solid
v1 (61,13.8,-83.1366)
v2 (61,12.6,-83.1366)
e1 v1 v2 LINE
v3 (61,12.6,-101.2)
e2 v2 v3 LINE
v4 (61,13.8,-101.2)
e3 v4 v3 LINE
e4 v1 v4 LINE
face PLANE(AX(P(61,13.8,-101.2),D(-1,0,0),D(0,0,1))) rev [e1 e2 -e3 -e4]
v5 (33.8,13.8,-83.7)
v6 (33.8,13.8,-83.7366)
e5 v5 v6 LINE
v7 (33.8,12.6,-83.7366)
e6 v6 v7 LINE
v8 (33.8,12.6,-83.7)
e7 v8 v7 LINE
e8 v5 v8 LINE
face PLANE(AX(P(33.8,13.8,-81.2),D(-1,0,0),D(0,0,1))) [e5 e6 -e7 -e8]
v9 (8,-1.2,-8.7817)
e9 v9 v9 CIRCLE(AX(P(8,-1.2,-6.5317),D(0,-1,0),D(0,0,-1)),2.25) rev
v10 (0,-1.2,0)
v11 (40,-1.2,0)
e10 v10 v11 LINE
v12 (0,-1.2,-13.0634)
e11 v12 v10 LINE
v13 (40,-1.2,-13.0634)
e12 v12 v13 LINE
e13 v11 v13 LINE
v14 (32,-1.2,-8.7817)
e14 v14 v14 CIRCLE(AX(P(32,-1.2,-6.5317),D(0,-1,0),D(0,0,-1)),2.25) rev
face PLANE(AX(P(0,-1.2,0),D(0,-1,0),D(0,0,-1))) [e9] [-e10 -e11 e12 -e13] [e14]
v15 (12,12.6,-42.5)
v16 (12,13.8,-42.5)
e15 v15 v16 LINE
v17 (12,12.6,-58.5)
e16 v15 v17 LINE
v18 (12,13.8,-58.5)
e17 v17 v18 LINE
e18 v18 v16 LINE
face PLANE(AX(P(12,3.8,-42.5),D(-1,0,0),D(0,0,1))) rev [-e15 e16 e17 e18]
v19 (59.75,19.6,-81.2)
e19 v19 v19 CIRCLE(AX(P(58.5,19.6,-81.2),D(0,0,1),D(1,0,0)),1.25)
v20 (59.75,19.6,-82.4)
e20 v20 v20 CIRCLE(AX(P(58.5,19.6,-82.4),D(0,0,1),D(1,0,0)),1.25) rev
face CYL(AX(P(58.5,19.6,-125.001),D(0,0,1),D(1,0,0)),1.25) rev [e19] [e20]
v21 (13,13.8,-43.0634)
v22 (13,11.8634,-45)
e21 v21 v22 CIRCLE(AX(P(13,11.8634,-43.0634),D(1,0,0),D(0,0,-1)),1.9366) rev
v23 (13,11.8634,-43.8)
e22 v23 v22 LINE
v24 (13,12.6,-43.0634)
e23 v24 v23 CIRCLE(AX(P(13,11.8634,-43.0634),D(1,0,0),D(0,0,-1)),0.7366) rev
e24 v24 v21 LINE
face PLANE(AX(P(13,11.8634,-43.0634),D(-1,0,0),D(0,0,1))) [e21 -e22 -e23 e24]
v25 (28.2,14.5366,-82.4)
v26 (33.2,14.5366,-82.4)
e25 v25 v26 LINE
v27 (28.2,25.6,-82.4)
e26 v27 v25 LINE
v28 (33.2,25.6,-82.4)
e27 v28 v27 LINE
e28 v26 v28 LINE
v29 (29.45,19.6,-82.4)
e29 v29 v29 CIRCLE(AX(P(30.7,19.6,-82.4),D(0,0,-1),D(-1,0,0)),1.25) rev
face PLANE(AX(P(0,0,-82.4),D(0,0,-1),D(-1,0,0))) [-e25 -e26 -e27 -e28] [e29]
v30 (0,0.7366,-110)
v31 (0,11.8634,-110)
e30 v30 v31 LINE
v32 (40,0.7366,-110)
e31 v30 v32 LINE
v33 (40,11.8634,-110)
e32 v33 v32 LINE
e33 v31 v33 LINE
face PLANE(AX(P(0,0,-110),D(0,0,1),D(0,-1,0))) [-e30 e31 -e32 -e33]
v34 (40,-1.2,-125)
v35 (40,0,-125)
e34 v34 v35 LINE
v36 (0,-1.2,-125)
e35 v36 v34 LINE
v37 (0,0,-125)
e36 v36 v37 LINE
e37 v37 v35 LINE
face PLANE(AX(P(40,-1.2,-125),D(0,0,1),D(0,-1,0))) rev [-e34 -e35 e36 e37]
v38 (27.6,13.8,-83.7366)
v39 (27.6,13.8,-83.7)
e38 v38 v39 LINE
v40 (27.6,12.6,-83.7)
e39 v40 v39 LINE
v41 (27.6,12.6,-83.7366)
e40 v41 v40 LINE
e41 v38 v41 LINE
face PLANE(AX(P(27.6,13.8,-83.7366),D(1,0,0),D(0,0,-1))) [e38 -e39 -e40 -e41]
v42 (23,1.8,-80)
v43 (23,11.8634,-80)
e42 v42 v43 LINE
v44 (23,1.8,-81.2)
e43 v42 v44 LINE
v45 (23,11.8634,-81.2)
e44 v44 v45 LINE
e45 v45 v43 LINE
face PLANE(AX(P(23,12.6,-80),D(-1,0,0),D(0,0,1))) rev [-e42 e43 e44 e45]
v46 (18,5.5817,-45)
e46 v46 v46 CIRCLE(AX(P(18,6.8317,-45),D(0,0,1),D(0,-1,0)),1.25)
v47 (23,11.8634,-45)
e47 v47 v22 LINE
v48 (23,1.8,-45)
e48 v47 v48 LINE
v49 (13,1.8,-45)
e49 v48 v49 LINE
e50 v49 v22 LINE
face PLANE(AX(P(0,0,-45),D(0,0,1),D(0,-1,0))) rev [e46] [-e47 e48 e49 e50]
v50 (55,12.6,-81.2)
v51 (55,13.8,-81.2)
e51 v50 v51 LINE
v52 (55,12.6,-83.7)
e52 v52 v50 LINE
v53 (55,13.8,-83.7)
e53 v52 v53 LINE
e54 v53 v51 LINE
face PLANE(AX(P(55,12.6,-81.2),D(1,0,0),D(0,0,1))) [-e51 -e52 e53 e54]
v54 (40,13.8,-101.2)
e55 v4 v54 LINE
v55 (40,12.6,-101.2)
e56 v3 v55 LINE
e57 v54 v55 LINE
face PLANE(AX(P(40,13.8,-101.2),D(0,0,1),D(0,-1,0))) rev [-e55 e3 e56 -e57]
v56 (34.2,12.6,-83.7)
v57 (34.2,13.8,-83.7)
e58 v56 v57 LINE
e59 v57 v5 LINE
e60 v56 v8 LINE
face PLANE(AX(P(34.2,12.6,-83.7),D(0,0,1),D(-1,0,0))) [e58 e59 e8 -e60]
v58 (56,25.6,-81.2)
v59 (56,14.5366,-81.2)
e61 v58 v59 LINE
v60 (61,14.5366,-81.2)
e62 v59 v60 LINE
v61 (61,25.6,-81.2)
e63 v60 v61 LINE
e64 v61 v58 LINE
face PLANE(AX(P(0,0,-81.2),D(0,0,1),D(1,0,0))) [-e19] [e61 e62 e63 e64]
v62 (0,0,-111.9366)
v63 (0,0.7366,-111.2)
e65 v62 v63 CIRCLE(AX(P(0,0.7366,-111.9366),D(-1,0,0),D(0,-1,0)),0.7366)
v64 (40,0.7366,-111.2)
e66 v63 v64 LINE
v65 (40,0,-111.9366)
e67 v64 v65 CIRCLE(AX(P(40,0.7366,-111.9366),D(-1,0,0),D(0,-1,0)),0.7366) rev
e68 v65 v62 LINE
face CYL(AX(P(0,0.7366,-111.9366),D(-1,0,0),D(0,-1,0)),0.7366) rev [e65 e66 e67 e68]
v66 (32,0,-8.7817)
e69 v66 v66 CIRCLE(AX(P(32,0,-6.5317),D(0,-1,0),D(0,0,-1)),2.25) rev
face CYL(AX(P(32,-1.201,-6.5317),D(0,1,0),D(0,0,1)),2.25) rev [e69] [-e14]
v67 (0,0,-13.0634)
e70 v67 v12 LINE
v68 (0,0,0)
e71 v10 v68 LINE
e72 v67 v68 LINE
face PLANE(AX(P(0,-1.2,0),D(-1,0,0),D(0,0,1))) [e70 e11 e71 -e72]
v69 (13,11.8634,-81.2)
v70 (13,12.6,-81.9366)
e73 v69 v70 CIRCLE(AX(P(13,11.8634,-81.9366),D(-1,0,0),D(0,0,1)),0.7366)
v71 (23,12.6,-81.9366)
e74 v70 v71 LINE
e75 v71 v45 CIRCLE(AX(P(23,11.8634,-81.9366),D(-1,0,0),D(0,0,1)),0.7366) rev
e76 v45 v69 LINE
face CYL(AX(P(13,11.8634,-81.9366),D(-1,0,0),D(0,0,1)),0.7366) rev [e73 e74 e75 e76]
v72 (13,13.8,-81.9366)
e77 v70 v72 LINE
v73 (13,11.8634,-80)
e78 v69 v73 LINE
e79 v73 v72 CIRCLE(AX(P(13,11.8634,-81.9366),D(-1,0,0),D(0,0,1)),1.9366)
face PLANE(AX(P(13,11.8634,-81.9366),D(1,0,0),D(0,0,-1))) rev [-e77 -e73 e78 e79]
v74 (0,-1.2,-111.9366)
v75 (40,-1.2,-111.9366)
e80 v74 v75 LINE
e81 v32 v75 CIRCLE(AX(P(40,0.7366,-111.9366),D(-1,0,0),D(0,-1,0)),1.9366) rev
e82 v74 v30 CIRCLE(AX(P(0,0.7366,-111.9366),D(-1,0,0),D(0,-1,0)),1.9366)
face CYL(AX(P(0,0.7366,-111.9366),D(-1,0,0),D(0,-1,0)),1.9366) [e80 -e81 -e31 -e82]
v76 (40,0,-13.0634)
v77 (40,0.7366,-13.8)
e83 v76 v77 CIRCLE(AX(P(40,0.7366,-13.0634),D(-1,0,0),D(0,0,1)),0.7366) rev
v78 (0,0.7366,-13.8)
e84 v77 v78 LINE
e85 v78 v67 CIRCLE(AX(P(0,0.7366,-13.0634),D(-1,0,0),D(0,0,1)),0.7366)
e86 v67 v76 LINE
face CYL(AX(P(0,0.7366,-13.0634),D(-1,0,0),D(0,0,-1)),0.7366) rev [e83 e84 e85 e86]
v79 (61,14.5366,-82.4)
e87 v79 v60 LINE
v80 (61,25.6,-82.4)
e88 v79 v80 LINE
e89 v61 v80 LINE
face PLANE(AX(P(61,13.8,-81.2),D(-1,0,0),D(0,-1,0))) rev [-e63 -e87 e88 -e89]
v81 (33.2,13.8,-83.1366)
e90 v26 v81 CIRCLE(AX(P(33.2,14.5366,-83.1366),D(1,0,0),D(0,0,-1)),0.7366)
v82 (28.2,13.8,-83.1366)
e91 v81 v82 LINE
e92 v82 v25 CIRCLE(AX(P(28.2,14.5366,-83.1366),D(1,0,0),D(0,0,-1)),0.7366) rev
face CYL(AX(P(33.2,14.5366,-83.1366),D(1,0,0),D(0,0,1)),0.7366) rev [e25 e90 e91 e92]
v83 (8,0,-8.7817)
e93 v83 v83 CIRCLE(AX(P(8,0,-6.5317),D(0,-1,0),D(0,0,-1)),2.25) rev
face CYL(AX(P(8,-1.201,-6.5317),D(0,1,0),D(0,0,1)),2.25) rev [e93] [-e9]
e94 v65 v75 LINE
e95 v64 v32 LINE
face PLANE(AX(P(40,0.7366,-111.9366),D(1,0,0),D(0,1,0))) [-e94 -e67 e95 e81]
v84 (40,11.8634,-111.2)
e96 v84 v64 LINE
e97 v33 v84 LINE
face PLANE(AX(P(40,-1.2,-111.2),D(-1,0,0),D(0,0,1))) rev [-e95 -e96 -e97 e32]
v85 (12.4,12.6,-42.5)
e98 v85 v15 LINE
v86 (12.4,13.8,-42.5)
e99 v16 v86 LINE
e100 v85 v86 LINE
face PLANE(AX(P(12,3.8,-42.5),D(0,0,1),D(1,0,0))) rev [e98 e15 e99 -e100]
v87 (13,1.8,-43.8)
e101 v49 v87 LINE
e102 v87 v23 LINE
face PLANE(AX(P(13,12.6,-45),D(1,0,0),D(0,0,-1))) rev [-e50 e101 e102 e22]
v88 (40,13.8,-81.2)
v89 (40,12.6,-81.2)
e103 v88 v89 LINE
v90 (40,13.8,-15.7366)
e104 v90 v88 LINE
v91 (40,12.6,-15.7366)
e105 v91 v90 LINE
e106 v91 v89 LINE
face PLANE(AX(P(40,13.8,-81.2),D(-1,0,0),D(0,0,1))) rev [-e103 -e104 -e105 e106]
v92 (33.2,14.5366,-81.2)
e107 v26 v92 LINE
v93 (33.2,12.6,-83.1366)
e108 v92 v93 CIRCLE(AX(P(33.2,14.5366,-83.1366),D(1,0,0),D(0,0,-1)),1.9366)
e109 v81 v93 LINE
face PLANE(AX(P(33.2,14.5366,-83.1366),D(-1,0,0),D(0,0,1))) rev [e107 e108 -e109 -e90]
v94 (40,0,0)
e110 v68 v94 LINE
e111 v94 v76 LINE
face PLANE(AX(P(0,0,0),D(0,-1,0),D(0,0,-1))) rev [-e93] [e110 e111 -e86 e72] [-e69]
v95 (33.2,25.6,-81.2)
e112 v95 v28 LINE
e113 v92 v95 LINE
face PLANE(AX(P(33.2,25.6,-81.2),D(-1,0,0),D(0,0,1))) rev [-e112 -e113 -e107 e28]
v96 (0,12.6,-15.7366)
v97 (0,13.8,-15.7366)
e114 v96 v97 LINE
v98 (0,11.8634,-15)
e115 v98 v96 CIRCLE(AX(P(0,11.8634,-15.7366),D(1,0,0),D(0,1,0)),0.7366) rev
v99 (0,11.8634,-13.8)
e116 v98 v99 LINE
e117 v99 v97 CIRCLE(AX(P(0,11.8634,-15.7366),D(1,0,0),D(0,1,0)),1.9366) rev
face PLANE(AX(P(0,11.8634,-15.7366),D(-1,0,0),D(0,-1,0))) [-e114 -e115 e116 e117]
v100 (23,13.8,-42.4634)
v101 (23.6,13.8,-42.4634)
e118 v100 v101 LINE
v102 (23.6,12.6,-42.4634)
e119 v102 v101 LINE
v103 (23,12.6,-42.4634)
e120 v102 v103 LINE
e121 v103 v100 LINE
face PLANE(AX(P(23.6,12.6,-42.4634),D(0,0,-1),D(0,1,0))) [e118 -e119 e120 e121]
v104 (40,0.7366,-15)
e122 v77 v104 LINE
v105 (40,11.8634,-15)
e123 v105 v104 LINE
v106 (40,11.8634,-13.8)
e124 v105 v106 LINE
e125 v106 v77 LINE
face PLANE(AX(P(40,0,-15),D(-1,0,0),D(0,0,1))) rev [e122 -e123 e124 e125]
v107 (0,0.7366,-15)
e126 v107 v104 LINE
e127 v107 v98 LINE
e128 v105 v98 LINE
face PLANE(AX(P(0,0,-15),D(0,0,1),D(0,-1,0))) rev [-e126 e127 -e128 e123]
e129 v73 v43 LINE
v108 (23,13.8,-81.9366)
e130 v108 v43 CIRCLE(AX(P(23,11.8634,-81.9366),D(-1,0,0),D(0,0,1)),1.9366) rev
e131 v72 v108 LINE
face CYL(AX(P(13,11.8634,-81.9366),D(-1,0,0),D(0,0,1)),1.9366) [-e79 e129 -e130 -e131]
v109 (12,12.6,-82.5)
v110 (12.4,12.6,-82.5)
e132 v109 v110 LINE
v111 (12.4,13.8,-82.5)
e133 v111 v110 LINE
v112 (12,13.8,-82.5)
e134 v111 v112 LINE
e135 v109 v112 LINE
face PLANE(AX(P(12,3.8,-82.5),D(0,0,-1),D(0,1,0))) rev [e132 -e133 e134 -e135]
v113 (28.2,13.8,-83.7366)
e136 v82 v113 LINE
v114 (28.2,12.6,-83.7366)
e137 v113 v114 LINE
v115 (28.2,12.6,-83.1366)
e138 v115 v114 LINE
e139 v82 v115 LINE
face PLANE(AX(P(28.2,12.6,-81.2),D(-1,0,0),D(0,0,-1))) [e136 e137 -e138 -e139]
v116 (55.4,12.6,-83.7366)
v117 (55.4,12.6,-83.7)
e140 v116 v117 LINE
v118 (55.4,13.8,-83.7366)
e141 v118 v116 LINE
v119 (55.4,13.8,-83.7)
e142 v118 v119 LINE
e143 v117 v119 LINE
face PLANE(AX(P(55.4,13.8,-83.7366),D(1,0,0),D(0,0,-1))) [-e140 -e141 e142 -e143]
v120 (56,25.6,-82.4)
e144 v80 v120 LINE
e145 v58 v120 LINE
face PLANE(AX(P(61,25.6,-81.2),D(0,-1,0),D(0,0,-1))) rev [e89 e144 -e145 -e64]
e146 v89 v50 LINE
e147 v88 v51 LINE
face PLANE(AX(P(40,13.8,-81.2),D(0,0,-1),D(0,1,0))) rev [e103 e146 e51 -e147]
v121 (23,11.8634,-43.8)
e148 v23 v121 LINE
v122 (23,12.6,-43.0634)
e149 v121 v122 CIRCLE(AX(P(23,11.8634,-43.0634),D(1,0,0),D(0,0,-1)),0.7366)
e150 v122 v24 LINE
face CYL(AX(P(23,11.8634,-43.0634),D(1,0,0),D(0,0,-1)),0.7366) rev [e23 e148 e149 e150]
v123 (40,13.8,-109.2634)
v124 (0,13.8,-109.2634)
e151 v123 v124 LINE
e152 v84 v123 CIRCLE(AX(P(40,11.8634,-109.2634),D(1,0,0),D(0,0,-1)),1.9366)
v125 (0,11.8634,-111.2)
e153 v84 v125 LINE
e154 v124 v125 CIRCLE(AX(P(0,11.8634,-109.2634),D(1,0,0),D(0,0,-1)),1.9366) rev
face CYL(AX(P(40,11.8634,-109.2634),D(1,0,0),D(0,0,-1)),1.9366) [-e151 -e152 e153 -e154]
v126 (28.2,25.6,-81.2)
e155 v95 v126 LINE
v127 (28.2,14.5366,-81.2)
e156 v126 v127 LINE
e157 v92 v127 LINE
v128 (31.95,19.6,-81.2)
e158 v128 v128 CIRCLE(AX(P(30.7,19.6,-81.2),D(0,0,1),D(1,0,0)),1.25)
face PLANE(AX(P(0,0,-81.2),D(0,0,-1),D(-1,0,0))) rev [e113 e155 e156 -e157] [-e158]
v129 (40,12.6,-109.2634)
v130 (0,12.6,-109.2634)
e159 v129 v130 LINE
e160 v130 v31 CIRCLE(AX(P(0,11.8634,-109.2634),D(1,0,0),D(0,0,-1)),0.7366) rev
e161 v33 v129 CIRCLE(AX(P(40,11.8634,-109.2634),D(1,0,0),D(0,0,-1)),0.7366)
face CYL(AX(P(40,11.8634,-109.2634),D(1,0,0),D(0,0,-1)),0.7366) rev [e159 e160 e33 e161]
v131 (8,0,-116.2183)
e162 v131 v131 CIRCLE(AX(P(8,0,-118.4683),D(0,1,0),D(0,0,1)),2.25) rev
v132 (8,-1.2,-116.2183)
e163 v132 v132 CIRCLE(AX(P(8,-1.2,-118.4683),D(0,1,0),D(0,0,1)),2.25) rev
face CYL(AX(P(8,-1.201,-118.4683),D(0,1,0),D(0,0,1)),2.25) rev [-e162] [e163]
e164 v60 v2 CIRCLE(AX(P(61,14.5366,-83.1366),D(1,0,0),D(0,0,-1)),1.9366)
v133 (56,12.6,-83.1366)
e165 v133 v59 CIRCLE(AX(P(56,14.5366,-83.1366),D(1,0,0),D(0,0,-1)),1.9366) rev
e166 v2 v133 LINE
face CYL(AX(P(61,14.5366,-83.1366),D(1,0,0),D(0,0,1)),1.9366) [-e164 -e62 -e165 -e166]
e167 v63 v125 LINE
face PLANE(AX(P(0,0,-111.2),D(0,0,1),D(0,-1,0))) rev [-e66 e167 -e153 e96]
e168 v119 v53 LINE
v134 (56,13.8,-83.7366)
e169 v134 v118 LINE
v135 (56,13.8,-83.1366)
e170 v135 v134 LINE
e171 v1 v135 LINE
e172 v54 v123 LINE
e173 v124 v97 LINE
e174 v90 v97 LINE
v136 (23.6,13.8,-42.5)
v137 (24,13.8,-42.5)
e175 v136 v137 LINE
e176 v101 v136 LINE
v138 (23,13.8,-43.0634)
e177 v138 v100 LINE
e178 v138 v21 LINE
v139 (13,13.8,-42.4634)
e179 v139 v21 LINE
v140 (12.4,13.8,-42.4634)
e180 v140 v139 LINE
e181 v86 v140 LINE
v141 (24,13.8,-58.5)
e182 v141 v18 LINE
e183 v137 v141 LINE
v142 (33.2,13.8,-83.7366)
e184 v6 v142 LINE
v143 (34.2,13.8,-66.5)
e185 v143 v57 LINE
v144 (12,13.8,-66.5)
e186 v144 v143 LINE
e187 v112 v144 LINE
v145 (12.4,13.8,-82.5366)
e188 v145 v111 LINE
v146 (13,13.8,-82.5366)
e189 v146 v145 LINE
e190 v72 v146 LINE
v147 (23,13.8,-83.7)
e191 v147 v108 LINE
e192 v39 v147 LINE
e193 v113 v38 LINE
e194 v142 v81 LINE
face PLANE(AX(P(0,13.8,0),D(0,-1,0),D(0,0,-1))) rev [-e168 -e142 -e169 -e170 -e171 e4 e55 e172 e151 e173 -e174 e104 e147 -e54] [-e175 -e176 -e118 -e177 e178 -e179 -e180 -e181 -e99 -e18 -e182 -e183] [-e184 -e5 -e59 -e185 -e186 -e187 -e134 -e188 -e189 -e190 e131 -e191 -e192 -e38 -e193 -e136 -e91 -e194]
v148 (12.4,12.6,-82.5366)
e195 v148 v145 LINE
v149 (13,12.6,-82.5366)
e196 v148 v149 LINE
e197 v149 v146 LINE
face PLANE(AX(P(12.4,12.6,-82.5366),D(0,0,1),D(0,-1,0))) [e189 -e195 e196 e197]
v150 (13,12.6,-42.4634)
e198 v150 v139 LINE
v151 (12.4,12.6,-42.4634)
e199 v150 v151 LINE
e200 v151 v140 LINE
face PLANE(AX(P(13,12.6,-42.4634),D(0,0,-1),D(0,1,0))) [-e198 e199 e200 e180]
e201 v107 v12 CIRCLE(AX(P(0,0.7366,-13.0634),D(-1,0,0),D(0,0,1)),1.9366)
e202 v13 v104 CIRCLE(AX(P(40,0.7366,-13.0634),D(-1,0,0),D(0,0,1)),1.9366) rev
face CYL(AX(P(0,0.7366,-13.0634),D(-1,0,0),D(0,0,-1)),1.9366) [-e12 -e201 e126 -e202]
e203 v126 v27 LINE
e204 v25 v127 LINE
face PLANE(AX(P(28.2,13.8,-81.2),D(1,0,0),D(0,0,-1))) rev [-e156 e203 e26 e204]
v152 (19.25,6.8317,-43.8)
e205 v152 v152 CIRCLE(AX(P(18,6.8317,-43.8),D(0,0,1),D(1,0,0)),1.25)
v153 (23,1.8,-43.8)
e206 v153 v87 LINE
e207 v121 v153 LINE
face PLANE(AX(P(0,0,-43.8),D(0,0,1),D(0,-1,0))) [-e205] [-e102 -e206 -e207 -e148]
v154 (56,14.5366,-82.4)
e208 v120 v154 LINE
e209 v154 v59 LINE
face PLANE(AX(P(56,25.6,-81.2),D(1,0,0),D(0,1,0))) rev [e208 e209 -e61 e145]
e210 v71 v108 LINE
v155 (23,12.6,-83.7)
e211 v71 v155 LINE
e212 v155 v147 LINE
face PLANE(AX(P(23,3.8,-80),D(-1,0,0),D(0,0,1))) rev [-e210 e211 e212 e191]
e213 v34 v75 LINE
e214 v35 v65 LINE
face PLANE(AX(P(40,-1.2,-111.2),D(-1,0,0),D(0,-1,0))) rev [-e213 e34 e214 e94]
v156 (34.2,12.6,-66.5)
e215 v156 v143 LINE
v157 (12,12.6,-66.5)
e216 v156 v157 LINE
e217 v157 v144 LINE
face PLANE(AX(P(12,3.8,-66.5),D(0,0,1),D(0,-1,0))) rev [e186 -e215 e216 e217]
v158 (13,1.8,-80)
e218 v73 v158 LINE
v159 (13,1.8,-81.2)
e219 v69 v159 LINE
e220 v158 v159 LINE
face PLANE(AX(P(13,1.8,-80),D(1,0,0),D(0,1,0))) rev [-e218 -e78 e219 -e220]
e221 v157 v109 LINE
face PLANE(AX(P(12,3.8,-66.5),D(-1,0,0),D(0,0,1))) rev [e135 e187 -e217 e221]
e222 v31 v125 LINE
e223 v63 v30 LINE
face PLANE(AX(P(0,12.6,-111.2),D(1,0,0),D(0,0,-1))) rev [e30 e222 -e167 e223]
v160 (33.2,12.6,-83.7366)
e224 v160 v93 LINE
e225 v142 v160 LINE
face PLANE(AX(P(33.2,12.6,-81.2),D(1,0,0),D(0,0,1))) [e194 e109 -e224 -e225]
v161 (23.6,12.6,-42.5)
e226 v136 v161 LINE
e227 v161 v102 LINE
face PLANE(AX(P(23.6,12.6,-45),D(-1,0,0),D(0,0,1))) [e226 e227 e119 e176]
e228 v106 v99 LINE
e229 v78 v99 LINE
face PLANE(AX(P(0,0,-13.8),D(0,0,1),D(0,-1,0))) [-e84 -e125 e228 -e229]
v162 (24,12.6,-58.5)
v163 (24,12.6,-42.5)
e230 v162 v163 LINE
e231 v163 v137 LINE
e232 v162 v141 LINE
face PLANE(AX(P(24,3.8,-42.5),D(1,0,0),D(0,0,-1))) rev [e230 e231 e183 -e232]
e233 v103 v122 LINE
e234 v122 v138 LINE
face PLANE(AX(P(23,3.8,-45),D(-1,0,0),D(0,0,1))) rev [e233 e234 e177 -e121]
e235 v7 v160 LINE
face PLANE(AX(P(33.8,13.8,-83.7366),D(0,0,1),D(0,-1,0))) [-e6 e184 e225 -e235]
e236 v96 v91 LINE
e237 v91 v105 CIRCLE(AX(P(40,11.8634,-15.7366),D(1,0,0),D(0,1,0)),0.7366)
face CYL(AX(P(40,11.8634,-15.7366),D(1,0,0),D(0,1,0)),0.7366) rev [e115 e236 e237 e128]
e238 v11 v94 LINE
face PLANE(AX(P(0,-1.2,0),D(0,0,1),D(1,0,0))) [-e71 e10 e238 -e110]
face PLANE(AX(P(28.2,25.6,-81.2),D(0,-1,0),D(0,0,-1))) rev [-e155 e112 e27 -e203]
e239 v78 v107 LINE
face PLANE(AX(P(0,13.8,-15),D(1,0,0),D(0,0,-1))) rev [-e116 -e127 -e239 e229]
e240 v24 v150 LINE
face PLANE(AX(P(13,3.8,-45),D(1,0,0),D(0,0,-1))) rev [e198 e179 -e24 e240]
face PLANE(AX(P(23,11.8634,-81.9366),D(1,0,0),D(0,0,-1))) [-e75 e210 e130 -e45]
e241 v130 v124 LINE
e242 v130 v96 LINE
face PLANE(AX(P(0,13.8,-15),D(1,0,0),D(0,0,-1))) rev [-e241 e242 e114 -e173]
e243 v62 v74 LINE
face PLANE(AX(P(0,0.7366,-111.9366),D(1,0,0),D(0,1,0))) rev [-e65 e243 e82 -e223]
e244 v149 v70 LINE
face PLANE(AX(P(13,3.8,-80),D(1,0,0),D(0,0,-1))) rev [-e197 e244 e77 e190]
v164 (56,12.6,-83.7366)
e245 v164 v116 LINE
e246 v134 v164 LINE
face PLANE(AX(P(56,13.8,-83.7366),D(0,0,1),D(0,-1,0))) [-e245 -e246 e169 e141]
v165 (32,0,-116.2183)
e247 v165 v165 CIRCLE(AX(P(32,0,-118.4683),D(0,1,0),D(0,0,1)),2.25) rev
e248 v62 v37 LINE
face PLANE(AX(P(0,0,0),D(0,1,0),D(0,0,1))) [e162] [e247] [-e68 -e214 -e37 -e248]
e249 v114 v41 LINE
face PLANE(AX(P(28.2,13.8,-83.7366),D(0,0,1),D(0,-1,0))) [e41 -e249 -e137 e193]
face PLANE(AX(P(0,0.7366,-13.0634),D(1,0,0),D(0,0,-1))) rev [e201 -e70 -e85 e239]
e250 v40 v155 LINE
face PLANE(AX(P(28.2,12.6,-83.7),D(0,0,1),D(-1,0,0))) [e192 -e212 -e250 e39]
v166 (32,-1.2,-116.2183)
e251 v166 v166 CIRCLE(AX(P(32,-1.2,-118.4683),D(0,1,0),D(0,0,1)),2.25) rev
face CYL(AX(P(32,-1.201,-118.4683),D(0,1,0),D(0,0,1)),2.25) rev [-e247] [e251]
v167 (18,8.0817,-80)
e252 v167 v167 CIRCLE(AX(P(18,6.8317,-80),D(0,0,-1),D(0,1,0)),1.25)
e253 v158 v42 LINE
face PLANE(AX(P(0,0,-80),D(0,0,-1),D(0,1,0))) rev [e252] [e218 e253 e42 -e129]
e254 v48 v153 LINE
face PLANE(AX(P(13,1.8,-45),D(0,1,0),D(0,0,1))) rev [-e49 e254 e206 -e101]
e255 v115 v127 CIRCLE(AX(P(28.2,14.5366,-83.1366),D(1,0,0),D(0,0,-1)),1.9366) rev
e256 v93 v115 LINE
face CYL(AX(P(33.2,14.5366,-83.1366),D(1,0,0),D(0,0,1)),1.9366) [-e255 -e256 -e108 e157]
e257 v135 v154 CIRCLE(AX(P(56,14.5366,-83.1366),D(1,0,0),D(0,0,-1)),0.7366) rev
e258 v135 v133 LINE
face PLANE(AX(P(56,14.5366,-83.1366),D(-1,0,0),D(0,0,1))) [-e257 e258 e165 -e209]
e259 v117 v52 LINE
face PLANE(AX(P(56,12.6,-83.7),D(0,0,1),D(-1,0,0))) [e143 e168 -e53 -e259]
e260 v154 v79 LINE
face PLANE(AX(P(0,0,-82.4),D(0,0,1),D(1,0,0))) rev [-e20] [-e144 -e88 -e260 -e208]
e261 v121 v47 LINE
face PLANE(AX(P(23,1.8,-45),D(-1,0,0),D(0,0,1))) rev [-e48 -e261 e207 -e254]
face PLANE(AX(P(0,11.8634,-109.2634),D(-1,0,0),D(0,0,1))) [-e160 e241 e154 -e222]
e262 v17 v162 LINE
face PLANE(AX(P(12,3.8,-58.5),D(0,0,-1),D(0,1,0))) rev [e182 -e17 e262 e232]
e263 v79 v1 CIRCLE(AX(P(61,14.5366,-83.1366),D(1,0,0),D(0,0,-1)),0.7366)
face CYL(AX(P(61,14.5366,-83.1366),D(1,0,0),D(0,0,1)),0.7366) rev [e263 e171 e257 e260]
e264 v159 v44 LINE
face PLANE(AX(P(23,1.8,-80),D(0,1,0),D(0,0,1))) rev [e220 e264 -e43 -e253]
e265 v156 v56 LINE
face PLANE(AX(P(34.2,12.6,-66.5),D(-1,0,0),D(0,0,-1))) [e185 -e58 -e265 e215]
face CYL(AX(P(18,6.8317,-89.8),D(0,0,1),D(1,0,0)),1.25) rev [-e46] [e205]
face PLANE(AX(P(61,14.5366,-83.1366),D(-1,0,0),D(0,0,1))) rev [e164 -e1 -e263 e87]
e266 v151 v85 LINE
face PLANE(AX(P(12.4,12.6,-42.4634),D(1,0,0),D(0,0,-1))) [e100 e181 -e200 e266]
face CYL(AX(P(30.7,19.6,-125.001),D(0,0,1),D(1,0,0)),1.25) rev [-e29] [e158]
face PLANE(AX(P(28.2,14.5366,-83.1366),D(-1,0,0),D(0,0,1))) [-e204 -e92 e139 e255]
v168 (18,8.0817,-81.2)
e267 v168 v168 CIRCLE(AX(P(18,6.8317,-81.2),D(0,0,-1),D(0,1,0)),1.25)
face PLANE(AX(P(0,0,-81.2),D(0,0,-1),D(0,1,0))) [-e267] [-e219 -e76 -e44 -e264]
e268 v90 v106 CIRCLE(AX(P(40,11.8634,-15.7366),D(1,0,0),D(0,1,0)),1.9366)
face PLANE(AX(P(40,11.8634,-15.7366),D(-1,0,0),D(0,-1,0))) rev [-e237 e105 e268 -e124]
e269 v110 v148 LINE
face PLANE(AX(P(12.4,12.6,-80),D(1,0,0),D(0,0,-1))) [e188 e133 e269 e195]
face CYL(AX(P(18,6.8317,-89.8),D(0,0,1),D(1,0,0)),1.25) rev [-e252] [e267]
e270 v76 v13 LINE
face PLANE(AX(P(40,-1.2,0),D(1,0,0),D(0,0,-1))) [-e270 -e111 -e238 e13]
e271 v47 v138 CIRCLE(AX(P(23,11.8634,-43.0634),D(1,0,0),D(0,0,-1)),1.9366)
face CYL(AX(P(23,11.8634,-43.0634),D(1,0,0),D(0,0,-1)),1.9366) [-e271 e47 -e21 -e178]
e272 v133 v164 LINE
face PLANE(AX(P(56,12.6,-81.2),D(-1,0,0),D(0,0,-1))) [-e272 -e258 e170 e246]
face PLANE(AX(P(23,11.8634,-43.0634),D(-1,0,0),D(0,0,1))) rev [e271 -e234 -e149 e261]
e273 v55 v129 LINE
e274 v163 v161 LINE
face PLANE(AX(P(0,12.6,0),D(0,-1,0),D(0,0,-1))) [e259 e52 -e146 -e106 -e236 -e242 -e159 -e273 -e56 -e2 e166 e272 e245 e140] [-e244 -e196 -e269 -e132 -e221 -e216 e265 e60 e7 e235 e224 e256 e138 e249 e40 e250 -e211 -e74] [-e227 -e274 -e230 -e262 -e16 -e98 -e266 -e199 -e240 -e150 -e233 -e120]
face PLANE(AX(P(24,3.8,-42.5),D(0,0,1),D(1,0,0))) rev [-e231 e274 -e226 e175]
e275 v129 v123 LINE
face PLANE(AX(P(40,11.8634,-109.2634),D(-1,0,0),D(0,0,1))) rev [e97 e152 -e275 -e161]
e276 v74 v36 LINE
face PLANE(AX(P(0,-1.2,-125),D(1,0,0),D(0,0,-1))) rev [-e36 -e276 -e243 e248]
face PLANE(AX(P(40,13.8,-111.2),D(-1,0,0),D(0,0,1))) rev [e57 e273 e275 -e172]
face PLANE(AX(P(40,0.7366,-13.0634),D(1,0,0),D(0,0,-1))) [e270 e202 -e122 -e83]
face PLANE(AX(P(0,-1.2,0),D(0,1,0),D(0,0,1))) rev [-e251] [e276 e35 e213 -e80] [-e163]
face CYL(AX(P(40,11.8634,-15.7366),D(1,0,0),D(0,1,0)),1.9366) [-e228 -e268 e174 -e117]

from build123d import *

# Parameters (mm, degrees)
SKETCH_1_W                       = 40
SKETCH_1_H                       = 15
SM_BASE_FLANGE_1_DEPTH           = 1.2
SM_EDGE_FLANGE_1_STRIP_W         = 6.2732
SM_EDGE_FLANGE_1_STRIP_H         = 1.2
SM_EDGE_FLANGE_1_STRIP_CUT_DEPTH = 40
SM_EDGE_FLANGE_1_DEPTH           = 40
SM_EDGE_FLANGE_2_STRIP_W         = 6.2732
SM_EDGE_FLANGE_2_STRIP_H         = 1.2
SM_EDGE_FLANGE_2_STRIP_CUT_DEPTH = 40
SM_EDGE_FLANGE_2_DEPTH           = 40
SM_EDGE_FLANGE_2_FLAT_DEPTH      = 1.2
SM_EDGE_FLANGE_3_STRIP_W         = 6.2732
SM_EDGE_FLANGE_3_STRIP_H         = 1.2
SM_EDGE_FLANGE_3_STRIP_CUT_DEPTH = 40
SM_EDGE_FLANGE_3_DEPTH           = 40
SM_EDGE_FLANGE_4_STRIP_W         = 6.2732
SM_EDGE_FLANGE_4_STRIP_H         = 1.2
SM_EDGE_FLANGE_4_STRIP_CUT_DEPTH = 40
SM_EDGE_FLANGE_4_DEPTH           = 40
CUT_EXTRUDE_1_DEPTH              = 10
SM_START                         = 13
SM_EDGE_FLANGE_5_DEPTH           = 10
SM_START_2                       = 12.4
SM_EDGE_FLANGE_5_2_OUTLINE_W     = 1.2
SM_EDGE_FLANGE_5_2_OUTLINE_H     = 0.0366
SM_EDGE_FLANGE_5_2_DEPTH         = 0.6
SM_START_3                       = 23
SM_EDGE_FLANGE_5_3_OUTLINE_W     = 1.2
SM_EDGE_FLANGE_5_3_OUTLINE_H     = 0.0366
SM_EDGE_FLANGE_5_3_DEPTH         = 0.6
SM_EDGE_FLANGE_5_4_DEPTH         = 10
SKETCH_26_R                      = 1.25
CUT_EXTRUDE_2_DEPTH              = 46
CUT_EXTRUDE_3_REACH              = 141.896
SKETCH_28_W                      = 1
SKETCH_28_H                      = 2.5
SM_START_4                       = 28.2
SM_EDGE_FLANGE_6_DEPTH           = 5
SM_START_5                       = 56
SM_EDGE_FLANGE_6_2_DEPTH         = 5
SM_START_6                       = 27.6
SM_EDGE_FLANGE_6_3_OUTLINE_W     = 1.2
SM_EDGE_FLANGE_6_3_OUTLINE_H     = 0.0366
SM_EDGE_FLANGE_6_3_DEPTH         = 0.6
SM_START_7                       = 33.2
SM_EDGE_FLANGE_6_4_OUTLINE_W     = 1.2
SM_EDGE_FLANGE_6_4_OUTLINE_H     = 0.0366
SM_EDGE_FLANGE_6_4_DEPTH         = 0.6
SM_START_8                       = 55.4
SM_EDGE_FLANGE_6_5_OUTLINE_W     = 1.2
SM_EDGE_FLANGE_6_5_OUTLINE_H     = 0.0366
SM_EDGE_FLANGE_6_5_DEPTH         = 0.6
SM_EDGE_FLANGE_6_6_DEPTH         = 5
SM_EDGE_FLANGE_6_7_DEPTH         = 5
CUT_EXTRUDE_4_REACH              = 106.737
SKETCH_35_R                      = 1.25
CUT_EXTRUDE_5_REACH              = 141.896
SKETCH_36_R                      = 2.25


# Read off the part's stored shape, not the designer's step: Ребро-кромка5, Ребро-кромка6
# Sheet-metal steps are written as plain solids
with BuildPart() as part:
    # Sketch 1 → Базовая кромка1 (new body)
    with BuildSketch(Plane(origin=(0, 0, 0), x_dir=(1, 0, 0), z_dir=(0, 1, 0))):
        with Locations((20, 7.5)):
            Rectangle(SKETCH_1_W, SKETCH_1_H)
    extrude(amount=-SM_BASE_FLANGE_1_DEPTH)

    # Ребро-кромка1 strip (across the edge) → Ребро-кромка1 strip cut (cut)
    with BuildSketch(Plane(origin=(40, 0, -15), x_dir=(0, 0, 1), z_dir=(-1, 0, 0))):
        with Locations((-1.2, -0.6)):
            Rectangle(SM_EDGE_FLANGE_1_STRIP_W, SM_EDGE_FLANGE_1_STRIP_H)
    extrude(amount=SM_EDGE_FLANGE_1_STRIP_CUT_DEPTH, mode=Mode.SUBTRACT)

    # Ребро-кромка1 section (across the edge) → Ребро-кромка1 (add)
    with BuildSketch(Plane(origin=(40, 0, -15), x_dir=(0, 0, 1), z_dir=(-1, 0, 0))):
        with BuildLine():
            Line((0, 0.7366), (0, 13.8))
            Line((0, 13.8), (1.2, 13.8))
            Line((1.2, 13.8), (1.2, 0.7366))
            ThreePointArc((1.2, 0.7366), (1.415745145, 0.215745145), (1.9366, 0))
            Line((1.9366, 0), (1.9366, -1.2))
            ThreePointArc((1.9366, -1.2), (0.567217008, -0.632782992), (0, 0.7366))
        make_face()
    extrude(amount=SM_EDGE_FLANGE_1_DEPTH)

    # Ребро-кромка2 strip (across the edge) → Ребро-кромка2 strip cut (cut)
    with BuildSketch(Plane(origin=(0, 13.8, -15), x_dir=(0, -1, 0), z_dir=(1, 0, 0))):
        with Locations((-1.2, -0.6)):
            Rectangle(SM_EDGE_FLANGE_2_STRIP_W, SM_EDGE_FLANGE_2_STRIP_H)
    extrude(amount=SM_EDGE_FLANGE_2_STRIP_CUT_DEPTH, mode=Mode.SUBTRACT)

    # Ребро-кромка2 bend section (across the edge) → Ребро-кромка2 (add)
    with BuildSketch(Plane(origin=(0, 13.8, -15), x_dir=(0, -1, 0), z_dir=(1, 0, 0))):
        with BuildLine():
            Line((0, 0.7366), (1.2, 0.7366))
            ThreePointArc((1.2, 0.7366), (1.415745145, 0.215745145), (1.9366, 0))
            Line((1.9366, 0), (1.9366, -1.2))
            ThreePointArc((1.9366, -1.2), (0.567217008, -0.632782992), (0, 0.7366))
        make_face()
    extrude(amount=SM_EDGE_FLANGE_2_DEPTH)

    # Ребро-кромка2 profile (on flange) → Ребро-кромка2 flat (add)
    with BuildSketch(Plane(origin=(0, 13.8, -15), x_dir=(1, 0, 0), z_dir=(0, 1, 0))):
        Polygon((0, 0.7366), (40, 0.7366), (40, 66.2), (61, 66.2), (61, 86.2), (40, 86.2), (40, 96.2), (0, 96.2), align=None)
    extrude(amount=-SM_EDGE_FLANGE_2_FLAT_DEPTH)

    # Ребро-кромка3 strip (across the edge) → Ребро-кромка3 strip cut (cut)
    with BuildSketch(Plane(origin=(0, 12.6, -111.2), x_dir=(0, 0, 1), z_dir=(1, 0, 0))):
        with Locations((-1.2, -0.6)):
            Rectangle(SM_EDGE_FLANGE_3_STRIP_W, SM_EDGE_FLANGE_3_STRIP_H)
    extrude(amount=SM_EDGE_FLANGE_3_STRIP_CUT_DEPTH, mode=Mode.SUBTRACT)

    # Ребро-кромка3 section (across the edge) → Ребро-кромка3 (add)
    with BuildSketch(Plane(origin=(0, 12.6, -111.2), x_dir=(0, 0, 1), z_dir=(1, 0, 0))):
        with BuildLine():
            Line((0, 0.7366), (0, 13.8))
            Line((0, 13.8), (1.2, 13.8))
            Line((1.2, 13.8), (1.2, 0.7366))
            ThreePointArc((1.2, 0.7366), (1.415745145, 0.215745145), (1.9366, 0))
            Line((1.9366, 0), (1.9366, -1.2))
            ThreePointArc((1.9366, -1.2), (0.567217008, -0.632782992), (0, 0.7366))
        make_face()
    extrude(amount=SM_EDGE_FLANGE_3_DEPTH)

    # Ребро-кромка4 strip (across the edge) → Ребро-кромка4 strip cut (cut)
    with BuildSketch(Plane(origin=(40, -1.2, -111.2), x_dir=(0, 1, 0), z_dir=(-1, 0, 0))):
        with Locations((-1.2, -0.6)):
            Rectangle(SM_EDGE_FLANGE_4_STRIP_W, SM_EDGE_FLANGE_4_STRIP_H)
    extrude(amount=SM_EDGE_FLANGE_4_STRIP_CUT_DEPTH, mode=Mode.SUBTRACT)

    # Ребро-кромка4 section (across the edge) → Ребро-кромка4 (add)
    with BuildSketch(Plane(origin=(40, -1.2, -111.2), x_dir=(0, 1, 0), z_dir=(-1, 0, 0))):
        with BuildLine():
            Line((0, 0.7366), (0, 13.8))
            Line((0, 13.8), (1.2, 13.8))
            Line((1.2, 13.8), (1.2, 0.7366))
            ThreePointArc((1.2, 0.7366), (1.415745145, 0.215745145), (1.9366, 0))
            Line((1.9366, 0), (1.9366, -1.2))
            ThreePointArc((1.9366, -1.2), (0.567217008, -0.632782992), (0, 0.7366))
        make_face()
    extrude(amount=SM_EDGE_FLANGE_4_DEPTH)

    # Эскиз19 → Вырез-Вытянуть1 (cut)
    with BuildSketch(Plane(origin=(0, 13.8, 0), x_dir=(1, 0, 0), z_dir=(0, 1, 0))):
        Polygon((13, 45), (23, 45), (23, 42.5), (24, 42.5), (24, 58.5), (12, 58.5), (12, 42.5), (13, 42.5), align=None)
        Polygon((12, 66.5), (24, 66.5), (24, 82.5), (23, 82.5), (23, 80), (13, 80), (13, 82.5), (12, 82.5), align=None)
    extrude(amount=-CUT_EXTRUDE_1_DEPTH, mode=Mode.SUBTRACT)

    # Ребро-кромка5 outline → Ребро-кромка5 (cut)
    with BuildSketch(Plane.YZ.offset(SM_START)):
        with BuildLine():
            ThreePointArc((12.6, -80.145555612), (13.472269031, -80.858657516), (13.8, -81.9366))
            Line((13.8, -81.9366), (13.8, -80))
            Line((13.8, -80), (12.6, -80))
            Line((12.6, -80), (12.6, -80.145555612))
        make_face()
        with BuildLine():
            Line((12.6, -45), (13.8, -45))
            Line((13.8, -45), (13.8, -43.0634))
            ThreePointArc((13.8, -43.0634), (13.472269031, -44.141342484), (12.6, -44.854444388))
            Line((12.6, -44.854444388), (12.6, -45))
        make_face()
    extrude(amount=SM_EDGE_FLANGE_5_DEPTH, mode=Mode.SUBTRACT)

    # Sm Edge Flange 5 2 outline → Sm Edge Flange 5 2 (cut)
    with BuildSketch(Plane.YZ.offset(SM_START_2)):
        with Locations((13.2, -82.5183)):
            Rectangle(SM_EDGE_FLANGE_5_2_OUTLINE_W, SM_EDGE_FLANGE_5_2_OUTLINE_H)
        with Locations((13.2, -42.4817)):
            Rectangle(SM_EDGE_FLANGE_5_2_OUTLINE_W, SM_EDGE_FLANGE_5_2_OUTLINE_H)
    extrude(amount=SM_EDGE_FLANGE_5_2_DEPTH, mode=Mode.SUBTRACT)

    # Sm Edge Flange 5 3 outline → Sm Edge Flange 5 3 (cut)
    with BuildSketch(Plane.YZ.offset(SM_START_3)):
        with Locations((13.2, -82.5183)):
            Rectangle(SM_EDGE_FLANGE_5_3_OUTLINE_W, SM_EDGE_FLANGE_5_3_OUTLINE_H)
        with Locations((13.2, -42.4817)):
            Rectangle(SM_EDGE_FLANGE_5_3_OUTLINE_W, SM_EDGE_FLANGE_5_3_OUTLINE_H)
    extrude(amount=SM_EDGE_FLANGE_5_3_DEPTH, mode=Mode.SUBTRACT)

    # Sm Edge Flange 5 4 outline → Sm Edge Flange 5 4 (add)
    with BuildSketch(Plane.YZ.offset(SM_START)):
        with BuildLine():
            ThreePointArc((11.8634, -81.2), (12.384254855, -81.415745145), (12.6, -81.9366))
            Line((12.6, -81.9366), (12.6, -80.145555612))
            ThreePointArc((12.6, -80.145555612), (12.238821762, -80.036737358), (11.8634, -80))
            Line((11.8634, -80), (1.8, -80))
            Line((1.8, -80), (1.8, -81.2))
            Line((1.8, -81.2), (11.8634, -81.2))
        make_face()
        with BuildLine():
            ThreePointArc((11.8634, -45), (12.238821762, -44.963262642), (12.6, -44.854444388))
            Line((12.6, -44.854444388), (12.6, -43.0634))
            ThreePointArc((12.6, -43.0634), (12.384254855, -43.584254855), (11.8634, -43.8))
            Line((11.8634, -43.8), (1.8, -43.8))
            Line((1.8, -43.8), (1.8, -45))
            Line((1.8, -45), (11.8634, -45))
        make_face()
    extrude(amount=SM_EDGE_FLANGE_5_4_DEPTH)

    # Эскиз26 → Вырез-Вытянуть2 (cut)
    with BuildSketch(Plane.XY.offset(-43.8)):
        with Locations((18, 6.8317)):
            Circle(SKETCH_26_R)
    extrude(amount=-CUT_EXTRUDE_2_DEPTH, mode=Mode.SUBTRACT)

    # Эскиз28 → Вырез-Вытянуть3 (cut, up to next)
    with BuildSketch(Plane(origin=(0, 13.8, 0), x_dir=(1, 0, 0), z_dir=(0, 1, 0)), mode=Mode.PRIVATE) as cut_extrude_3_sk1:
        with Locations((55.5, 82.45)):
            Rectangle(SKETCH_28_W, SKETCH_28_H)
    cut_extrude_3_tool1 = extrude(cut_extrude_3_sk1.sketch, amount=-CUT_EXTRUDE_3_REACH, mode=Mode.PRIVATE) & part.part
    # Эскиз28 → Вырез-Вытянуть3 (cut, up to next)
    with BuildSketch(Plane(origin=(0, 13.8, 0), x_dir=(1, 0, 0), z_dir=(0, 1, 0)), mode=Mode.PRIVATE) as cut_extrude_3_sk2:
        Polygon((28.2, 81.2), (33.2, 81.2), (33.2, 83.7), (34.2, 83.7), (34.2, 66.5), (23, 66.5), (23, 83.7), (28.2, 83.7), align=None)
    cut_extrude_3_tool2 = extrude(cut_extrude_3_sk2.sketch, amount=-CUT_EXTRUDE_3_REACH, mode=Mode.PRIVATE) & part.part
    add(cut_extrude_3_tool1.solids().sort_by_distance((55.5, 13.8, -82.45))[0], mode=Mode.SUBTRACT)
    add(cut_extrude_3_tool2.solids().sort_by_distance((28.45428, 13.8, -74.58998))[0], mode=Mode.SUBTRACT)

    # Ребро-кромка6 outline → Ребро-кромка6 (cut)
    with BuildSketch(Plane.YZ.offset(SM_START_4)):
        with BuildLine():
            ThreePointArc((12.6, -83.1366), (12.927730969, -82.058657516), (13.8, -81.345555612))
            Line((13.8, -81.345555612), (13.8, -81.2))
            Line((13.8, -81.2), (12.6, -81.2))
            Line((12.6, -81.2), (12.6, -83.1366))
        make_face()
    extrude(amount=SM_EDGE_FLANGE_6_DEPTH, mode=Mode.SUBTRACT)

    # Sm Edge Flange 6 2 outline → Sm Edge Flange 6 2 (cut)
    with BuildSketch(Plane.YZ.offset(SM_START_5)):
        with BuildLine():
            ThreePointArc((12.6, -83.1366), (12.927730969, -82.058657516), (13.8, -81.345555612))
            Line((13.8, -81.345555612), (13.8, -81.2))
            Line((13.8, -81.2), (12.6, -81.2))
            Line((12.6, -81.2), (12.6, -83.1366))
        make_face()
    extrude(amount=SM_EDGE_FLANGE_6_2_DEPTH, mode=Mode.SUBTRACT)

    # Sm Edge Flange 6 3 outline → Sm Edge Flange 6 3 (cut)
    with BuildSketch(Plane.YZ.offset(SM_START_6)):
        with Locations((13.2, -83.7183)):
            Rectangle(SM_EDGE_FLANGE_6_3_OUTLINE_W, SM_EDGE_FLANGE_6_3_OUTLINE_H)
    extrude(amount=SM_EDGE_FLANGE_6_3_DEPTH, mode=Mode.SUBTRACT)

    # Sm Edge Flange 6 4 outline → Sm Edge Flange 6 4 (cut)
    with BuildSketch(Plane.YZ.offset(SM_START_7)):
        with Locations((13.2, -83.7183)):
            Rectangle(SM_EDGE_FLANGE_6_4_OUTLINE_W, SM_EDGE_FLANGE_6_4_OUTLINE_H)
    extrude(amount=SM_EDGE_FLANGE_6_4_DEPTH, mode=Mode.SUBTRACT)

    # Sm Edge Flange 6 5 outline → Sm Edge Flange 6 5 (cut)
    with BuildSketch(Plane.YZ.offset(SM_START_8)):
        with Locations((13.2, -83.7183)):
            Rectangle(SM_EDGE_FLANGE_6_5_OUTLINE_W, SM_EDGE_FLANGE_6_5_OUTLINE_H)
    extrude(amount=SM_EDGE_FLANGE_6_5_DEPTH, mode=Mode.SUBTRACT)

    # Sm Edge Flange 6 6 outline → Sm Edge Flange 6 6 (add)
    with BuildSketch(Plane.YZ.offset(SM_START_4)):
        with BuildLine():
            Line((25.6, -81.2), (14.5366, -81.2))
            ThreePointArc((14.5366, -81.2), (14.161178238, -81.236737358), (13.8, -81.345555612))
            Line((13.8, -81.345555612), (13.8, -83.1366))
            ThreePointArc((13.8, -83.1366), (14.015745145, -82.615745145), (14.5366, -82.4))
            Line((14.5366, -82.4), (25.6, -82.4))
            Line((25.6, -82.4), (25.6, -81.2))
        make_face()
    extrude(amount=SM_EDGE_FLANGE_6_6_DEPTH)

    # Sm Edge Flange 6 7 outline → Sm Edge Flange 6 7 (add)
    with BuildSketch(Plane.YZ.offset(SM_START_5)):
        with BuildLine():
            Line((25.6, -81.2), (14.5366, -81.2))
            ThreePointArc((14.5366, -81.2), (14.161178238, -81.236737358), (13.8, -81.345555612))
            Line((13.8, -81.345555612), (13.8, -83.1366))
            ThreePointArc((13.8, -83.1366), (14.015745145, -82.615745145), (14.5366, -82.4))
            Line((14.5366, -82.4), (25.6, -82.4))
            Line((25.6, -82.4), (25.6, -81.2))
        make_face()
    extrude(amount=SM_EDGE_FLANGE_6_7_DEPTH)

    # Эскиз35 → Вырез-Вытянуть4 (cut, up to next)
    with BuildSketch(Plane.XY.offset(-81.2), mode=Mode.PRIVATE) as cut_extrude_4_sk1:
        with Locations((30.7, 19.6)):
            Circle(SKETCH_35_R)
    cut_extrude_4_tool1 = extrude(cut_extrude_4_sk1.sketch, amount=-CUT_EXTRUDE_4_REACH, mode=Mode.PRIVATE) & part.part
    # Эскиз35 → Вырез-Вытянуть4 (cut, up to next)
    with BuildSketch(Plane.XY.offset(-81.2), mode=Mode.PRIVATE) as cut_extrude_4_sk2:
        with Locations((58.5, 19.6)):
            Circle(SKETCH_35_R)
    cut_extrude_4_tool2 = extrude(cut_extrude_4_sk2.sketch, amount=-CUT_EXTRUDE_4_REACH, mode=Mode.PRIVATE) & part.part
    add(cut_extrude_4_tool1.solids().sort_by_distance((30.7, 19.6, -81.2))[0], mode=Mode.SUBTRACT)
    add(cut_extrude_4_tool2.solids().sort_by_distance((58.5, 19.6, -81.2))[0], mode=Mode.SUBTRACT)

    # Эскиз36 → Вырез-Вытянуть5 (cut, up to next)
    with BuildSketch(Plane(origin=(0, 13.8, 0), x_dir=(1, 0, 0), z_dir=(0, 1, 0)), mode=Mode.PRIVATE) as cut_extrude_5_sk1:
        with Locations(Location((8, 118.4683, 0), (0, 0, 270))):
            Circle(SKETCH_36_R)
    cut_extrude_5_tool1 = extrude(cut_extrude_5_sk1.sketch, amount=-CUT_EXTRUDE_5_REACH, mode=Mode.PRIVATE) & part.part
    # Эскиз36 → Вырез-Вытянуть5 (cut, up to next)
    with BuildSketch(Plane(origin=(0, 13.8, 0), x_dir=(1, 0, 0), z_dir=(0, 1, 0)), mode=Mode.PRIVATE) as cut_extrude_5_sk2:
        with Locations(Location((32, 118.4683, 0), (0, 0, 270))):
            Circle(SKETCH_36_R)
    cut_extrude_5_tool2 = extrude(cut_extrude_5_sk2.sketch, amount=-CUT_EXTRUDE_5_REACH, mode=Mode.PRIVATE) & part.part
    # Эскиз36 → Вырез-Вытянуть5 (cut, up to next)
    with BuildSketch(Plane(origin=(0, 13.8, 0), x_dir=(1, 0, 0), z_dir=(0, 1, 0)), mode=Mode.PRIVATE) as cut_extrude_5_sk3:
        with Locations(Location((8, 6.5317, 0), (0, 0, 90))):
            Circle(SKETCH_36_R)
    cut_extrude_5_tool3 = extrude(cut_extrude_5_sk3.sketch, amount=-CUT_EXTRUDE_5_REACH, mode=Mode.PRIVATE) & part.part
    # Эскиз36 → Вырез-Вытянуть5 (cut, up to next)
    with BuildSketch(Plane(origin=(0, 13.8, 0), x_dir=(1, 0, 0), z_dir=(0, 1, 0)), mode=Mode.PRIVATE) as cut_extrude_5_sk4:
        with Locations(Location((32, 6.5317, 0), (0, 0, 90))):
            Circle(SKETCH_36_R)
    cut_extrude_5_tool4 = extrude(cut_extrude_5_sk4.sketch, amount=-CUT_EXTRUDE_5_REACH, mode=Mode.PRIVATE) & part.part
    add(cut_extrude_5_tool1.solids().sort_by_distance((8, 13.8, -118.4683))[0], mode=Mode.SUBTRACT)
    add(cut_extrude_5_tool2.solids().sort_by_distance((32, 13.8, -118.4683))[0], mode=Mode.SUBTRACT)
    add(cut_extrude_5_tool3.solids().sort_by_distance((8, 13.8, -6.5317))[0], mode=Mode.SUBTRACT)
    add(cut_extrude_5_tool4.solids().sort_by_distance((32, 13.8, -6.5317))[0], mode=Mode.SUBTRACT)


solid = part.part
